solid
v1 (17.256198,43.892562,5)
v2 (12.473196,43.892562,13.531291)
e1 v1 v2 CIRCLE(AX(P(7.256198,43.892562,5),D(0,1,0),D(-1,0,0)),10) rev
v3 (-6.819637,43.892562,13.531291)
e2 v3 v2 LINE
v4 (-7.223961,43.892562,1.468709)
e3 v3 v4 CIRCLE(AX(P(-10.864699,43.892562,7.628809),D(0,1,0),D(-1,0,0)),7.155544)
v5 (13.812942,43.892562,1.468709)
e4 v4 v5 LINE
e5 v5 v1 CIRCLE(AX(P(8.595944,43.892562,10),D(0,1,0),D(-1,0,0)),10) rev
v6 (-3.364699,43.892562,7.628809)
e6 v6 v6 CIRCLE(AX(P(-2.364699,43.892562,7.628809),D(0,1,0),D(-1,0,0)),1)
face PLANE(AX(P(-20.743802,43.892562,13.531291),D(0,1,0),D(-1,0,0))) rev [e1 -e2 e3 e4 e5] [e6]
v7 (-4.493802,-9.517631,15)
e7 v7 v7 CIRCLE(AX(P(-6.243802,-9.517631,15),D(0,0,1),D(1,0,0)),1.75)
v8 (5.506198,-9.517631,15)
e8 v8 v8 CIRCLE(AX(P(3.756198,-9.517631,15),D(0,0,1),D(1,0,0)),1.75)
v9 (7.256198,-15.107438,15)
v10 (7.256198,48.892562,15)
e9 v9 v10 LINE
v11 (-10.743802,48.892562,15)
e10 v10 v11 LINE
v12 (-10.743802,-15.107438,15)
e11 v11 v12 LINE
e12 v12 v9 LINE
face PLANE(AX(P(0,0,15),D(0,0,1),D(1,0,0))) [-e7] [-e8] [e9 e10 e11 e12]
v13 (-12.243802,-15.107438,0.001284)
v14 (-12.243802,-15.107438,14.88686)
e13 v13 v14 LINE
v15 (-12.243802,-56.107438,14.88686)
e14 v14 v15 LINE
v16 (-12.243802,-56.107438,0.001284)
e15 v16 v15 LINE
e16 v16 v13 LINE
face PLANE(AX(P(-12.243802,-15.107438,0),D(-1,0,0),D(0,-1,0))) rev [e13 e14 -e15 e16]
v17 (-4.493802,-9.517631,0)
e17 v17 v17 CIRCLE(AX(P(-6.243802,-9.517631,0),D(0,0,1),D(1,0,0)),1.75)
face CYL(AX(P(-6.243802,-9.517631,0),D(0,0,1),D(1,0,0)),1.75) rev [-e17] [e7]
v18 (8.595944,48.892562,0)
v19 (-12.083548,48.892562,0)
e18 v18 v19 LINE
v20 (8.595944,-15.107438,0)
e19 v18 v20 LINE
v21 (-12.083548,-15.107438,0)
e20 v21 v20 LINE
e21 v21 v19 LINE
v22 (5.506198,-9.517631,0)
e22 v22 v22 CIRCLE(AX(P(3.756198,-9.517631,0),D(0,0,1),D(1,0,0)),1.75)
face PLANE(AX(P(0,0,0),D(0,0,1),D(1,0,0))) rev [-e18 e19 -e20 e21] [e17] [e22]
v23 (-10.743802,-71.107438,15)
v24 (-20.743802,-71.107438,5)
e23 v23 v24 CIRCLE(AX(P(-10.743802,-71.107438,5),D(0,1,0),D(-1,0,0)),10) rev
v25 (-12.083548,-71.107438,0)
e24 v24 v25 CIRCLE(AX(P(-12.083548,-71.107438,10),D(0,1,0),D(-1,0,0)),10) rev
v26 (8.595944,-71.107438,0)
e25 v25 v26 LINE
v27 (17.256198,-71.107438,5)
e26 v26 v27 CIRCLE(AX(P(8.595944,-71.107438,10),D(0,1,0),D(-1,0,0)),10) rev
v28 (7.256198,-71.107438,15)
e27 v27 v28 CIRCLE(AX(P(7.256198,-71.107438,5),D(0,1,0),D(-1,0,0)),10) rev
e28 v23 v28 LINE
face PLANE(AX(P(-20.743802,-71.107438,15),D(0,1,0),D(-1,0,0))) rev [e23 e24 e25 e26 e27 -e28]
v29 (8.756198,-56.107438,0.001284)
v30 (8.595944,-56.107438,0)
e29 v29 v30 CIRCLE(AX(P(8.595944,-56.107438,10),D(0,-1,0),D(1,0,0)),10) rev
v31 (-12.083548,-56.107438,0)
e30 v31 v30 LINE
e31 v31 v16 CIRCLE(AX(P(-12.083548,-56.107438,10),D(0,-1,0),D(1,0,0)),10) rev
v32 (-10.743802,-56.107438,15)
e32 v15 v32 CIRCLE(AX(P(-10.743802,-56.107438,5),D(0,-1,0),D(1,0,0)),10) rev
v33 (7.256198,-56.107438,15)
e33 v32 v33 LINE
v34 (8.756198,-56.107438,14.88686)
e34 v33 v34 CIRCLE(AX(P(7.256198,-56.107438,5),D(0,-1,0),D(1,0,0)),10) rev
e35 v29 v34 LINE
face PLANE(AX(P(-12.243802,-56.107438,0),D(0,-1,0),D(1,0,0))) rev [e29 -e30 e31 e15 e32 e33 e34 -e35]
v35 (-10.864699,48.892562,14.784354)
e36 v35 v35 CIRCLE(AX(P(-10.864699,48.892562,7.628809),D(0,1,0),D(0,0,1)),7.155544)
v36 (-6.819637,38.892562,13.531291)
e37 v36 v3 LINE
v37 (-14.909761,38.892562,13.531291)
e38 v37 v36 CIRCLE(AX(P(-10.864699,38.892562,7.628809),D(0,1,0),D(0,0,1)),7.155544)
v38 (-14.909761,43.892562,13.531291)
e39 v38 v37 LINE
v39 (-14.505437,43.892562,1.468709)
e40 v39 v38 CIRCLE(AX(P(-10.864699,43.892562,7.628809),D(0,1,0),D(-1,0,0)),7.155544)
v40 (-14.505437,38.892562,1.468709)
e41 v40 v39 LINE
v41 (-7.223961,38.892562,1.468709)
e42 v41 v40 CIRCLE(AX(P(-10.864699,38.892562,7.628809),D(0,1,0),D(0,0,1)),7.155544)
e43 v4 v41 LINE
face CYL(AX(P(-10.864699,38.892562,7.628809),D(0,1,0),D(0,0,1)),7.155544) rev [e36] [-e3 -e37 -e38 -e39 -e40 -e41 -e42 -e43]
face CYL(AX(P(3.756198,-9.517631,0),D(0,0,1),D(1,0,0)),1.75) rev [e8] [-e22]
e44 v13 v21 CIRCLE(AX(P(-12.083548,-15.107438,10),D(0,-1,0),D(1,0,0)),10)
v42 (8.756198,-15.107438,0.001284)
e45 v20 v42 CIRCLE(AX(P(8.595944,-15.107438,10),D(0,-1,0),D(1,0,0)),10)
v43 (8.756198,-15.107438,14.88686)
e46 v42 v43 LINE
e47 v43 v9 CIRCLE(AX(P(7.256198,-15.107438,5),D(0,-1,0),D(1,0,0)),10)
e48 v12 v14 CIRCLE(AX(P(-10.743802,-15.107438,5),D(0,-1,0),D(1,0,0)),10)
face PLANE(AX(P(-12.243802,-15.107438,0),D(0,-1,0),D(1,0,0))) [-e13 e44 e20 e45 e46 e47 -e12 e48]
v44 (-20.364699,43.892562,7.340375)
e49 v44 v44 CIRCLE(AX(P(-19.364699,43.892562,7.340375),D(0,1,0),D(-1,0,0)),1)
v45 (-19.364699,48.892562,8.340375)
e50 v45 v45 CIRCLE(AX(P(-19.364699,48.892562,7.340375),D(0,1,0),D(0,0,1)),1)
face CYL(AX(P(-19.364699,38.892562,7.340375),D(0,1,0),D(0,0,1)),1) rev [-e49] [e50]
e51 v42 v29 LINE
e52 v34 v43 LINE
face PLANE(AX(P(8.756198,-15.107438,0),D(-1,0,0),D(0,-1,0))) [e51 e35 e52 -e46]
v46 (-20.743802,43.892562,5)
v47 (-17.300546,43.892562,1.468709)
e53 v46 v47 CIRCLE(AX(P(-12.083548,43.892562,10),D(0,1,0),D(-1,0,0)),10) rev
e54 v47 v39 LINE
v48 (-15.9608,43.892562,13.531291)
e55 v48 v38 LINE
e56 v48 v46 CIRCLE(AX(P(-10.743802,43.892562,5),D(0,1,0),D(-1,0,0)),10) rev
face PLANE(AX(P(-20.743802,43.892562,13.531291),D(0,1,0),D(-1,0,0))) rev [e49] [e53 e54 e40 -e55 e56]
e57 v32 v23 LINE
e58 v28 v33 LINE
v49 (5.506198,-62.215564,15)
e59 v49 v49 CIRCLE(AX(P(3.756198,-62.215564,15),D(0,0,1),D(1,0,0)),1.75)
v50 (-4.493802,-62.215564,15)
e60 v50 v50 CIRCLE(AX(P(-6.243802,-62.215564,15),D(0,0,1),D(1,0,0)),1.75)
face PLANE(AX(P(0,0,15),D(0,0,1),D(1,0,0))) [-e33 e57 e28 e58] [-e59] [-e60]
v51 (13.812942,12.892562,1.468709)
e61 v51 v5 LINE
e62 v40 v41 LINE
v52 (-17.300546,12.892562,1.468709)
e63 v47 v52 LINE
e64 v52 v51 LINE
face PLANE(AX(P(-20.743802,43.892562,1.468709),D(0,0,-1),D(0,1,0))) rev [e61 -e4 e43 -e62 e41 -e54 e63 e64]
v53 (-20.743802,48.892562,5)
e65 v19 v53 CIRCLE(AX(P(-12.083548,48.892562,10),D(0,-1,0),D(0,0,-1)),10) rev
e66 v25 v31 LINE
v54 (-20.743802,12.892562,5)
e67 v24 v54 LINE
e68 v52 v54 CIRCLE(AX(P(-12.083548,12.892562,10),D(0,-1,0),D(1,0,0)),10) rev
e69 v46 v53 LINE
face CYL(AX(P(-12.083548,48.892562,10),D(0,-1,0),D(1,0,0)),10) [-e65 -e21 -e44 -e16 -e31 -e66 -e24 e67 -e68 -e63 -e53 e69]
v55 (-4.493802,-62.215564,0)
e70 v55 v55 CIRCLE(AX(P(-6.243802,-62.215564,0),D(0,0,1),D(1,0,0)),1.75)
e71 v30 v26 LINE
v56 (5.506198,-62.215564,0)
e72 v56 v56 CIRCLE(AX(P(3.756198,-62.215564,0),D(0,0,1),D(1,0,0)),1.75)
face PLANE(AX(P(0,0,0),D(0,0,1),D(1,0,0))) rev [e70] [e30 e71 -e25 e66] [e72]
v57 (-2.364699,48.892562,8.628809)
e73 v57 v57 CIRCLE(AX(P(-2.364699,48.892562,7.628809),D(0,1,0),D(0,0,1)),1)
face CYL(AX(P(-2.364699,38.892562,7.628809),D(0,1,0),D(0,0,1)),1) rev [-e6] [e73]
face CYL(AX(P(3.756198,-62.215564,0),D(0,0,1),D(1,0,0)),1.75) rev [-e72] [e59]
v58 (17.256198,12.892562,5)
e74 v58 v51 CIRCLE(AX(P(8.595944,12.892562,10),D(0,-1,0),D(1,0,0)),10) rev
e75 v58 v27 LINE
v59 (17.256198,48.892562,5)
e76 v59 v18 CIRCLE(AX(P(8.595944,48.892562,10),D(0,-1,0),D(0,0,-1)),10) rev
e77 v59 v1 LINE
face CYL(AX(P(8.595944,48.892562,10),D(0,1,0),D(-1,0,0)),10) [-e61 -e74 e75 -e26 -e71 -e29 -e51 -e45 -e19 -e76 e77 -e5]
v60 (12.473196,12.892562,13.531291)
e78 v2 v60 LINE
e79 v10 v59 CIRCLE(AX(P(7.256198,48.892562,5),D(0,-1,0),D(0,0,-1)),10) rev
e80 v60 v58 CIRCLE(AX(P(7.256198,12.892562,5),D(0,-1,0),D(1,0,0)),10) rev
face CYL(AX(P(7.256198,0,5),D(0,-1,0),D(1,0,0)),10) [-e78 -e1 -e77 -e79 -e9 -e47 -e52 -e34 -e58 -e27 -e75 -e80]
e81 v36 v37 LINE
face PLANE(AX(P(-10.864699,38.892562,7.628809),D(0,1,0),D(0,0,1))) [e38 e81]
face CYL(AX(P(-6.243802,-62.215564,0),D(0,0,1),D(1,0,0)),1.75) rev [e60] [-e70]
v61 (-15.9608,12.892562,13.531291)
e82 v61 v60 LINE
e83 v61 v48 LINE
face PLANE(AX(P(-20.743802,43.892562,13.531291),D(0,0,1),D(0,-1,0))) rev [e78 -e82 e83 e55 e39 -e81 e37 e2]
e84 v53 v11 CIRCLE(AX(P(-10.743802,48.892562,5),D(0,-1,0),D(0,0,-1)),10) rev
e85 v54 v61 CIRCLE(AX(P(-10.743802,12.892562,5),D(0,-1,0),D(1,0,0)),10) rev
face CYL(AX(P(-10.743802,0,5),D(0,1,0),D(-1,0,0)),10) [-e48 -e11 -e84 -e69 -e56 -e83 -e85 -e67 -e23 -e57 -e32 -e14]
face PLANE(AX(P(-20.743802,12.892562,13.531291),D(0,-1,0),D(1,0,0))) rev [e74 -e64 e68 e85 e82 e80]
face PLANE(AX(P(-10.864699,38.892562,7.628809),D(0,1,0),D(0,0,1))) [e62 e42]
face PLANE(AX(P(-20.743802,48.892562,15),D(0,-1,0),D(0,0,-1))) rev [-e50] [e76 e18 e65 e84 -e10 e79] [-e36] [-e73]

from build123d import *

# Parameters (mm, degrees)
SKETCH1_W           = 38
SKETCH1_H           = 120
BOSS_EXTRUDE1_DEPTH = 15
SKETCH2_W           = 21
SKETCH2_H           = 41
CUT_EXTRUDE2_DEPTH  = 15
SKETCH3_R           = 1.75
CUT_EXTRUDE4_DEPTH  = 15
SKETCH6_W           = 12.0625825
SKETCH6_H           = 31
CUT_EXTRUDE8_DEPTH  = 38
SKETCH8_R           = 7.155544399
SKETCH8_R_2         = 1
CUT_EXTRUDE10_DEPTH = 10
FILLET2_R           = 10
FILLET3_R           = 10


with BuildPart() as part:
    # Sketch1 → Boss-Extrude1 (new body)
    with BuildSketch(Plane.XY):
        with Locations((-1.743801653, -11.107438017)):
            Rectangle(SKETCH1_W, SKETCH1_H)
    extrude(amount=BOSS_EXTRUDE1_DEPTH)

    # Sketch2 → Cut-Extrude2 (cut)
    with BuildSketch(Plane.XY.offset(15)):
        with Locations((-1.743801653, -35.607438017)):
            Rectangle(SKETCH2_W, SKETCH2_H)
    extrude(amount=-CUT_EXTRUDE2_DEPTH, mode=Mode.SUBTRACT)

    # Sketch3 → Cut-Extrude4 (cut)
    with BuildSketch(Plane.XY.offset(15)):
        with Locations((-6.243801653, -9.517630565)):
            Circle(SKETCH3_R)
        with Locations((3.756198347, -9.517630565)):
            Circle(SKETCH3_R)
        with Locations((-6.243801653, -62.215563881)):
            Circle(SKETCH3_R)
        with Locations((3.756198347, -62.215563881)):
            Circle(SKETCH3_R)
    extrude(amount=-CUT_EXTRUDE4_DEPTH, mode=Mode.SUBTRACT)

    # Sketch6 → Cut-Extrude8 (cut)
    with BuildSketch(Plane(origin=(17.256198347, 0, 0), x_dir=(0, 0, -1), z_dir=(1, 0, 0))):
        with Locations((-7.5, 28.392561983)):
            Rectangle(SKETCH6_W, SKETCH6_H)
    extrude(amount=-CUT_EXTRUDE8_DEPTH, mode=Mode.SUBTRACT)

    # Sketch8 → Cut-Extrude10 (cut)
    with BuildSketch(Plane(origin=(0, 48.892561983, 0), x_dir=(1, 0, 0), z_dir=(0, 1, 0))):
        with Locations(Location((-10.864699175, -7.628809465, 0), (0, 0, 270))):
            Circle(SKETCH8_R)
        with Locations(Location((-19.364699175, -7.340375333, 0), (0, 0, 270))):
            Circle(SKETCH8_R_2)
        with Locations(Location((-2.364699175, -7.628809465, 0), (0, 0, 270))):
            Circle(SKETCH8_R_2)
    extrude(amount=-CUT_EXTRUDE10_DEPTH, mode=Mode.SUBTRACT)

    # Fillet2
    # the kernel refuses this fillet: 10 mm, written as the material it takes off along each edge
    with BuildSketch(Plane(origin=(-20.743801653, -96.107438017, 15), x_dir=(0, 0, -1), z_dir=(0, 1, 0))) as fillet2_piece_1:
        with BuildLine():
            CenterArc((FILLET2_R, -FILLET2_R), FILLET2_R, 90, 90)
            Line((0, -FILLET2_R), (0, 0))
            Line((0, 0), (FILLET2_R, 0))
        make_face()
    extrude(amount=170, mode=Mode.SUBTRACT)
    with BuildSketch(Plane(origin=(17.256198347, 73.892561983, 15), x_dir=(-1, 0, 0), z_dir=(0, -1, 0))) as fillet2_piece_2:
        with BuildLine():
            CenterArc((FILLET2_R, FILLET2_R), FILLET2_R, 180, 90)
            Line((0, FILLET2_R), (0, 0))
            Line((0, 0), (FILLET2_R, 0))
        make_face()
    extrude(amount=170, mode=Mode.SUBTRACT)

    # Fillet3
    # the kernel refuses this fillet: 10 mm, written as the material it takes off along each edge
    with BuildSketch(Plane(origin=(-20.743801653, -92.758073111, 0), x_dir=(1, 0, 0), z_dir=(0, 1, 0)), Plane(origin=(17.256198347, 70.543197078, 0), x_dir=(-1, 0, 0), z_dir=(0, -1, 0))) as fillet3_piece_1:
        with BuildLine():
            CenterArc((8.660254038, -10), FILLET3_R, 90, 60)
            Line((0, -5), (-0.173205081, -4.9))
            ThreePointArc((-0.173205081, -4.9), (-0.2, -2.5), (-0.2, 0))
            Line((-0.2, 0), (0, 0.2))
            Line((0, 0.2), (8.660254038, 0.2))
            Line((8.660254038, 0.2), (8.660254038, 0))
        make_face()
    extrude(amount=163.301270189, mode=Mode.SUBTRACT)


solid = part.part
